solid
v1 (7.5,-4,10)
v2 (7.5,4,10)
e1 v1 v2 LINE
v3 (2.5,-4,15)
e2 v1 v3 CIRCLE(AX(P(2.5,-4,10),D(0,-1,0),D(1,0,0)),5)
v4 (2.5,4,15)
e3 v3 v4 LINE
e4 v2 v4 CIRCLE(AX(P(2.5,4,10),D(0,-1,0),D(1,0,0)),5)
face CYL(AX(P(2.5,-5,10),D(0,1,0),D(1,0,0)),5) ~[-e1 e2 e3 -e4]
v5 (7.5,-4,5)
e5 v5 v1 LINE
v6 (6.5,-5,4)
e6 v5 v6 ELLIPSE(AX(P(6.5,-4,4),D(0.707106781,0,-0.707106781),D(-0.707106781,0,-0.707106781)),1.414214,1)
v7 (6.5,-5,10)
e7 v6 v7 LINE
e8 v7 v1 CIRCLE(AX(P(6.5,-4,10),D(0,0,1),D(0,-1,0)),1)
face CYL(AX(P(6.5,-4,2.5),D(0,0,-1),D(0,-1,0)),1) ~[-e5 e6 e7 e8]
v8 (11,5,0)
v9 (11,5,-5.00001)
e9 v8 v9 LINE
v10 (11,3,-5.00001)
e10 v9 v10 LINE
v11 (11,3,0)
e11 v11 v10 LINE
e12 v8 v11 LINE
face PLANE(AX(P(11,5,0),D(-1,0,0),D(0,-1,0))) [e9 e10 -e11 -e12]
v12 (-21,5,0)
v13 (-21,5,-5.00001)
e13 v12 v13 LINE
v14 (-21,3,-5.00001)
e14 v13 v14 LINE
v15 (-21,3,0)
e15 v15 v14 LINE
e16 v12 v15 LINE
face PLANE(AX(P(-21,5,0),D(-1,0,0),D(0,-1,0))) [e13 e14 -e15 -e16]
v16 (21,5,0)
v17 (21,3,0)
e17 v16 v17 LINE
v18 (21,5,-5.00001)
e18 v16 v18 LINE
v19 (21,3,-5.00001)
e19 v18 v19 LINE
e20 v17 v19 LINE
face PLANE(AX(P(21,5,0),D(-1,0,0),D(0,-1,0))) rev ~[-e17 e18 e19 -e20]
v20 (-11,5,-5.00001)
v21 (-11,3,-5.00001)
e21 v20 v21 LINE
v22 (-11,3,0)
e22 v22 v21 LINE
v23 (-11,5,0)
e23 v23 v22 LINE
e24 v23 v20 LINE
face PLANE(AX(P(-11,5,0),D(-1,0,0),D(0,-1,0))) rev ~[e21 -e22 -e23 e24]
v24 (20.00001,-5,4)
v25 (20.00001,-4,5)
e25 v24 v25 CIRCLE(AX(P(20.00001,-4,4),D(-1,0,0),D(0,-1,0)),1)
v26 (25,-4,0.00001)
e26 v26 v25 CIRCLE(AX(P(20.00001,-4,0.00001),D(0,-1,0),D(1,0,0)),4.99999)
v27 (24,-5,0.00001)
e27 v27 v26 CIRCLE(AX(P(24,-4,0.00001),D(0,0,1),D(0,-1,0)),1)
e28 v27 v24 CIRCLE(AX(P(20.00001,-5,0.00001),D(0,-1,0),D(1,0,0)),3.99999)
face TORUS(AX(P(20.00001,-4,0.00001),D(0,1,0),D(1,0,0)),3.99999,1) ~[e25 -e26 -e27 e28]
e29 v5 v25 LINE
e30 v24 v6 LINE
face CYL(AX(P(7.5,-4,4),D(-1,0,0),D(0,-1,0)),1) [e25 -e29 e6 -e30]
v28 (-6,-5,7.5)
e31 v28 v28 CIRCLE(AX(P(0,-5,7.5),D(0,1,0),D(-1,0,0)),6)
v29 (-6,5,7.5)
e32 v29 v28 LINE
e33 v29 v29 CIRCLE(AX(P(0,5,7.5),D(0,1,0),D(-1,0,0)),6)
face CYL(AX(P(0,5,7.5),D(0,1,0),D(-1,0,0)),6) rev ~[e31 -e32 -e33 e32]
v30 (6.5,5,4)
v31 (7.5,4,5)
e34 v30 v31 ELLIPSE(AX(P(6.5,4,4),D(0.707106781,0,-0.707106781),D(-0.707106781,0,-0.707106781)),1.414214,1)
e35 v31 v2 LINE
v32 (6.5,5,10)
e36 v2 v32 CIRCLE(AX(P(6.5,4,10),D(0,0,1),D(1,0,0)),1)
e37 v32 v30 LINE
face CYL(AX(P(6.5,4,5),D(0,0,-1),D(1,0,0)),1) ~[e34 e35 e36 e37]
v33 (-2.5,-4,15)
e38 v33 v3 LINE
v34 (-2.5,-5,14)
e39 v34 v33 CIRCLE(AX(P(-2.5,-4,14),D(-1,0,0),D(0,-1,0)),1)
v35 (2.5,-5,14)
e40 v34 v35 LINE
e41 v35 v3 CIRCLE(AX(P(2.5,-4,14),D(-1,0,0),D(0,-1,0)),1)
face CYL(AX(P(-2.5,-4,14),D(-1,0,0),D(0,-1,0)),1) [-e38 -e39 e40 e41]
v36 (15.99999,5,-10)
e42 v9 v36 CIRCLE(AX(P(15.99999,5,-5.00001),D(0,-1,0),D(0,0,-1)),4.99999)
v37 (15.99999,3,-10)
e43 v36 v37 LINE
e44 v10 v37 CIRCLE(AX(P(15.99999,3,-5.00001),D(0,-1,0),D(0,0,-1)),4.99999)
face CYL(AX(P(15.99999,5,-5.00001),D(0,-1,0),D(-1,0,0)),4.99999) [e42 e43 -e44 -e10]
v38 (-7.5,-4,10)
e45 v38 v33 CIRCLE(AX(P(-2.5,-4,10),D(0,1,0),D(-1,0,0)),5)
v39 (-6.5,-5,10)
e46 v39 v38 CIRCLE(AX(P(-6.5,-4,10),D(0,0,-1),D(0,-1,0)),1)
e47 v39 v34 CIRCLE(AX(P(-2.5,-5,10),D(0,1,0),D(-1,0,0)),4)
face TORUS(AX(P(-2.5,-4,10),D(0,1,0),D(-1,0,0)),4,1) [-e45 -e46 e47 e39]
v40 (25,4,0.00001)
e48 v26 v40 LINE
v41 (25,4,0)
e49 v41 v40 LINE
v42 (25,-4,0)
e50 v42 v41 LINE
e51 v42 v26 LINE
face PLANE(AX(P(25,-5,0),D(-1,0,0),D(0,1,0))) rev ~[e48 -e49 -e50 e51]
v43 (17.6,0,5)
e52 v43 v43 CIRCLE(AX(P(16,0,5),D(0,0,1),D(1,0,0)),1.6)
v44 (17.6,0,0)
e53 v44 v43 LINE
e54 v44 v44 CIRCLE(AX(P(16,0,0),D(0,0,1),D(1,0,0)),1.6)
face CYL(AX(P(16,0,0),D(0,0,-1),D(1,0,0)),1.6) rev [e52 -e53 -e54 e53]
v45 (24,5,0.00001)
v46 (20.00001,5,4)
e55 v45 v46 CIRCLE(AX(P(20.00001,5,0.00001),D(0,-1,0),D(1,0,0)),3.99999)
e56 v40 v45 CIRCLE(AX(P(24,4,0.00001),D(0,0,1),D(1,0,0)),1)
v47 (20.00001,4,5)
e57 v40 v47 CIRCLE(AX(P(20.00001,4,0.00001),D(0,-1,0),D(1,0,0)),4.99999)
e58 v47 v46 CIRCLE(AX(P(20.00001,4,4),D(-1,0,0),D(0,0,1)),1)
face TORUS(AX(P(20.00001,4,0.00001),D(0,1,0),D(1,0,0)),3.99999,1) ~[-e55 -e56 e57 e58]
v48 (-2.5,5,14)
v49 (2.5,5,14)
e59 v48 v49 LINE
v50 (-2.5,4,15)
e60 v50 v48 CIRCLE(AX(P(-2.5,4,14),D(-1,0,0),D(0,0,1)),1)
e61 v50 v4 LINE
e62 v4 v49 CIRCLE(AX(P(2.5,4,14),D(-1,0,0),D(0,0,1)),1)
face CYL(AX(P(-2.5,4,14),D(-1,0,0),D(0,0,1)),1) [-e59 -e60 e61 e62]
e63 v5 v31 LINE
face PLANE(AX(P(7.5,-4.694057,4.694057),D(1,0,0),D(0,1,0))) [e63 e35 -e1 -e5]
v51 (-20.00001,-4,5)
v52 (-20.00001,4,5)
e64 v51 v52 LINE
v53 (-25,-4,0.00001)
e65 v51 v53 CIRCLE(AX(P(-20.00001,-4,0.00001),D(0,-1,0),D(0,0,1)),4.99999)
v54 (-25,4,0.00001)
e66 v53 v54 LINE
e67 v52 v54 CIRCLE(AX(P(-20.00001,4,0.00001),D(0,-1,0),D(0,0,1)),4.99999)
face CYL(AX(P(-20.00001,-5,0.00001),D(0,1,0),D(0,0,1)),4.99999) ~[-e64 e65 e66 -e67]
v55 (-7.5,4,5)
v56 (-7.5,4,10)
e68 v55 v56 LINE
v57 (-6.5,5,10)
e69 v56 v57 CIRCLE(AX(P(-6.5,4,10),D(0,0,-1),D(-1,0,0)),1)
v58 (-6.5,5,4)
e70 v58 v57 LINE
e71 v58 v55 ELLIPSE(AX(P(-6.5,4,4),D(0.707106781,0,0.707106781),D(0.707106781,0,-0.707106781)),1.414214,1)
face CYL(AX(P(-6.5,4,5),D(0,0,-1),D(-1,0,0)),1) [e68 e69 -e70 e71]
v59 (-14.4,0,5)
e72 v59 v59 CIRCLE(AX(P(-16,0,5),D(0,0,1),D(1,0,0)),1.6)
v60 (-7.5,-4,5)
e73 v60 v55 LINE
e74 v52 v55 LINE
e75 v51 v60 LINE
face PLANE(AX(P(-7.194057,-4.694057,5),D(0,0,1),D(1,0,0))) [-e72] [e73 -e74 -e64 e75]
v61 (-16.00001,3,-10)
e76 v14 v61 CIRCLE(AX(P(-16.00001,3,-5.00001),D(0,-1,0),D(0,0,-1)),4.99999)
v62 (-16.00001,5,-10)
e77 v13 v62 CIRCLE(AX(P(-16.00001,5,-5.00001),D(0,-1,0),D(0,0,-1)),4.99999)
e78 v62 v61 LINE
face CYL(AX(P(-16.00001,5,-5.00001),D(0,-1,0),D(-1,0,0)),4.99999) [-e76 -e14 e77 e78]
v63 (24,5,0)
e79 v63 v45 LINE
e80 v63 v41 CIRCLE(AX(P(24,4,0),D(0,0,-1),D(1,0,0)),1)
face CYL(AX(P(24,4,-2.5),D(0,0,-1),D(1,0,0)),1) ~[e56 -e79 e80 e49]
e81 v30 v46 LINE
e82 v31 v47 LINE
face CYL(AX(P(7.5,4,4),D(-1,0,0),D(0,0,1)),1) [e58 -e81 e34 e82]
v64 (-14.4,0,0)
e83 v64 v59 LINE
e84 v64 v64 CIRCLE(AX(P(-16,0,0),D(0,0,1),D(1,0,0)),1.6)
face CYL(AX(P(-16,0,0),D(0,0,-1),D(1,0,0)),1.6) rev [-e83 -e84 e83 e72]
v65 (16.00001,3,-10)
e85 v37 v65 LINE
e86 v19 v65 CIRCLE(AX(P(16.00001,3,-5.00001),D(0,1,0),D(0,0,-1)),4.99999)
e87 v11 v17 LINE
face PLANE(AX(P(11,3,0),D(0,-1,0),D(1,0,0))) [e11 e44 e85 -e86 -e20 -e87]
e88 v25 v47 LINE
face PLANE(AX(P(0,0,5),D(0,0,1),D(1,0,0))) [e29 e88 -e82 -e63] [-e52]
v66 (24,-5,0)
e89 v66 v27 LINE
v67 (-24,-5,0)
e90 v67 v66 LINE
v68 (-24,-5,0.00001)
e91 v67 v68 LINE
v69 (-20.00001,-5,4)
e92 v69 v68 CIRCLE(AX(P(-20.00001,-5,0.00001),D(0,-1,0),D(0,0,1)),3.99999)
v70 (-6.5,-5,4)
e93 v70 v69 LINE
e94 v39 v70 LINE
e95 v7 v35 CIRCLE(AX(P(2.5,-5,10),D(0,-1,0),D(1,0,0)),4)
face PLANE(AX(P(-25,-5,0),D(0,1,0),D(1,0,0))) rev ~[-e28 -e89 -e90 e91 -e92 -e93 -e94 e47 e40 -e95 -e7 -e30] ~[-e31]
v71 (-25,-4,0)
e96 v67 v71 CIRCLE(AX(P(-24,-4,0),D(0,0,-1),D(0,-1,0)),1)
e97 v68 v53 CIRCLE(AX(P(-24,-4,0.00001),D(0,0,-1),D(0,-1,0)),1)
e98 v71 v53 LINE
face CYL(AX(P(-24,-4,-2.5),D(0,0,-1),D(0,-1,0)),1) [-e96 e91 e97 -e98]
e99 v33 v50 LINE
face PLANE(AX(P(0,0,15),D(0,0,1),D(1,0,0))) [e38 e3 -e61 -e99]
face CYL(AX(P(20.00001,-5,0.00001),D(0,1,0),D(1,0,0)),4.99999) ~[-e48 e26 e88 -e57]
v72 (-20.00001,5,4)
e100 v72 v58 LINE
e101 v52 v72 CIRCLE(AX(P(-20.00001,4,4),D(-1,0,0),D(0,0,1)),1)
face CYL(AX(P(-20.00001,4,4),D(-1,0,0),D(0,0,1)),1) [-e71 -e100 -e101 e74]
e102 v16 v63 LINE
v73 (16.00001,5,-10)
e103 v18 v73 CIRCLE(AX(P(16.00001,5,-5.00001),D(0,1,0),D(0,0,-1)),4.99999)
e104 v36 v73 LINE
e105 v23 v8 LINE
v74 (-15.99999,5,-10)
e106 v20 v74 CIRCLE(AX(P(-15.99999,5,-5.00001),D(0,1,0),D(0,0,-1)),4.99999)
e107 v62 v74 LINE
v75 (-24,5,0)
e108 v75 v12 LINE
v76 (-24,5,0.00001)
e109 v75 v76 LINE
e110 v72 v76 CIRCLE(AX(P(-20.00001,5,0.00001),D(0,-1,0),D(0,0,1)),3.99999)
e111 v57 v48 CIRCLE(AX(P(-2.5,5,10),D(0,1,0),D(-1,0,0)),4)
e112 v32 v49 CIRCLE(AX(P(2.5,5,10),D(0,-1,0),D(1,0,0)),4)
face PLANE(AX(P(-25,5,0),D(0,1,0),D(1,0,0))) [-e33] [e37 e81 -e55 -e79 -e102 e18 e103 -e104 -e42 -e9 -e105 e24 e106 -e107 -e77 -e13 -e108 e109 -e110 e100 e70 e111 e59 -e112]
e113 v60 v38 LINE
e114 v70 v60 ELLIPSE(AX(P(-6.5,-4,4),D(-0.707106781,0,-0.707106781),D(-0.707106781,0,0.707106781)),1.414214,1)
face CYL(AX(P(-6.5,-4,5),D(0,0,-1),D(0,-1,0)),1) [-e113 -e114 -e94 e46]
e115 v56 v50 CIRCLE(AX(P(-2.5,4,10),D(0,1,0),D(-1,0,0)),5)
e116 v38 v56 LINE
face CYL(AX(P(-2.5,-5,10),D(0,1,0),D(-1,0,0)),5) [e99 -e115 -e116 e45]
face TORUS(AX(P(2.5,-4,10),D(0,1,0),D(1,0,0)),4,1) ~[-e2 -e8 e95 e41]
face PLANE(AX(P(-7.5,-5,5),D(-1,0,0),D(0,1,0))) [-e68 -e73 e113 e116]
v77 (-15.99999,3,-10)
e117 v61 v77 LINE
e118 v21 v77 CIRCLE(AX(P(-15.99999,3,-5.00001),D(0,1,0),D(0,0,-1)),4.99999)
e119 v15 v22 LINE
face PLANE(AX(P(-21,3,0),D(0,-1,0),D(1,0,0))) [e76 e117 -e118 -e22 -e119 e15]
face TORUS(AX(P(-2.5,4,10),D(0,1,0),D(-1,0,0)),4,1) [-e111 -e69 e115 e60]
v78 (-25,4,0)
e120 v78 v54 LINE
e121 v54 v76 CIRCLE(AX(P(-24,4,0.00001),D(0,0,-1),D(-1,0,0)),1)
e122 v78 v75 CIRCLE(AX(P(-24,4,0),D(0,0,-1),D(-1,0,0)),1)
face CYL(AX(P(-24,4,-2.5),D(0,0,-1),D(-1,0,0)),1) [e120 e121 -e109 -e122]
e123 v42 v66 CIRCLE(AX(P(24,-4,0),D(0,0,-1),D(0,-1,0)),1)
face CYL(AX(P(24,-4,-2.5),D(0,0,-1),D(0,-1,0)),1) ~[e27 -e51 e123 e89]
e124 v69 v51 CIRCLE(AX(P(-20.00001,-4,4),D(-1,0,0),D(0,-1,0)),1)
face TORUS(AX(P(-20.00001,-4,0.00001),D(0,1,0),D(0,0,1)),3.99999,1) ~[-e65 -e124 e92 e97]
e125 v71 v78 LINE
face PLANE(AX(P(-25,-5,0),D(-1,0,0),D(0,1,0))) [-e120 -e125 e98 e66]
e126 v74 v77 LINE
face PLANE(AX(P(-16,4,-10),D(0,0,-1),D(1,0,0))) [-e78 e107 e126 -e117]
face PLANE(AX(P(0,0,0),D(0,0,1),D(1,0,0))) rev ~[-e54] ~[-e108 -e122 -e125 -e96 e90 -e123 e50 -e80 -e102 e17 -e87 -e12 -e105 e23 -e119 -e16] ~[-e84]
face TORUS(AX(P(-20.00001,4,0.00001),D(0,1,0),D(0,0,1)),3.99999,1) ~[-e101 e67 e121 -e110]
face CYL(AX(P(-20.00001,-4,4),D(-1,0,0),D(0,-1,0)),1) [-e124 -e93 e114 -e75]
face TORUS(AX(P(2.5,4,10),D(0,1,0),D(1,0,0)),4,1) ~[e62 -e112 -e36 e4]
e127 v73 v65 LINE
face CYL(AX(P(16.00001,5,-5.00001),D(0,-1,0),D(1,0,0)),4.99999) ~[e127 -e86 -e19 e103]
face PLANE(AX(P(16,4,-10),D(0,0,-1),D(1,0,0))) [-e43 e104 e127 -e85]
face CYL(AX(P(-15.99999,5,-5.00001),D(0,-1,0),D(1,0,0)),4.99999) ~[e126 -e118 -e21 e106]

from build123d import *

# Parameters (mm, degrees)
F0_W         = 50
F0_H         = 10
F0_R         = 1.6
F1_DEPTH     = 5
F2_W         = 15
F2_H         = 10
F2_R         = 1.6
F3_DEPTH     = 10
F5_R         = 5
F6_R         = 4.99999
F4_R         = 6
F7_DEPTH     = 25
F8_T1_DEPTH  = 12.50001
F8_T3_DEPTH  = 5
F8_T5_DEPTH  = 5
F8_T7_DEPTH  = 12.50001
F8_T9_DEPTH  = 2.50001
F8_T12_ANGLE = 90
F8_T14_ANGLE = 90
F8_T16_ANGLE = 90
F8_T18_ANGLE = 90
F8_T20_ANGLE = 90
F8_T22_ANGLE = 90
F8_T24_ANGLE = 90
F8_T26_ANGLE = 90
F8_T31_DEPTH = 7.5
F8_T35_DEPTH = 15.00001
F8_T42_DEPTH = 15.00001
F8_T46_DEPTH = 7.5
F8_T53_DEPTH = 15.00001
F8_T57_DEPTH = 7.5
F8_T64_DEPTH = 7.5
F8_T68_DEPTH = 15.00001
F9_W         = 10
F9_H         = 2
F10_DEPTH    = 10
F11_R        = 4.99999


# Not quite as in the source:
# - a fillet or chamfer that OpenCascade refuses, or shapes differently, is made with other operations: its cross-section is extruded or revolved along the edge and cut away or added
# - a fillet or chamfer is up to 0.001 mm smaller than in the source, because OpenCascade refuses the exact size


with BuildPart() as f1:
    # F0 (on Top) → F1 (new body)
    with BuildSketch(Plane.XY):
        Rectangle(F0_W, F0_H)
        with Locations((-16, 0)):
            Circle(F0_R, mode=Mode.SUBTRACT)
        with Locations((16, 0)):
            Circle(F0_R, mode=Mode.SUBTRACT)
    extrude(amount=F1_DEPTH)

    # F2 (on face) → F3 (join)
    with BuildSketch(Plane.XY.offset(5)):
        Rectangle(F2_W, F2_H)
        with Locations((-3.9, 0)):
            Circle(F2_R, mode=Mode.SUBTRACT)
        with Locations((3.9, 0)):
            Circle(F2_R, mode=Mode.SUBTRACT)
        with Locations((3.9, 0)):
            Circle(F2_R)
        with Locations((-3.9, 0)):
            Circle(F2_R)
    extrude(amount=F3_DEPTH)

    # F5
    f5_edges = [f1.edges().sort_by_distance(p)[0] for p in [
        (7.5, 0, 15),
        (-7.5, 0, 15),
    ]]
    fillet(f5_edges, radius=F5_R)

    # F6 (radius 5 in the source; OpenCascade refuses exactly that, so slightly less here)
    f6_edges = [f1.edges().sort_by_distance(p)[0] for p in [
        (-25, 0, 5),
        (25, 0, 5),
    ]]
    fillet(f6_edges, radius=F6_R)

    # F4 (on face) → F7 (cut)
    with BuildSketch(Plane(origin=(0, 5, 0), x_dir=(-1, 0, 0), z_dir=(0, 1, 0))):
        with Locations((0, 7.5)):
            Circle(F4_R)
    extrude(amount=-F7_DEPTH, mode=Mode.SUBTRACT)

    # F8: fillet of radius 1 on 18 edges, made by hand

    # F8_s2 → F8_t1 (cut)
    with BuildSketch(Plane.YZ.offset(7.5)):
        with BuildLine():
            ThreePointArc((-5, 4), (-4.7071067812, 4.7071067812), (-4, 5))
            Line((-4, 5), (-5, 5))
            Line((-5, 5), (-5, 4))
        make_face()
        with BuildLine():
            ThreePointArc((4, 5), (4.7071067812, 4.7071067812), (5, 4))
            Line((5, 4), (5, 5))
            Line((5, 5), (4, 5))
        make_face()
    extrude(amount=F8_T1_DEPTH, mode=Mode.SUBTRACT)

    # F8_s4 → F8_t3 (cut)
    with BuildSketch(Plane.XY.offset(5)):
        with BuildLine():
            ThreePointArc((6.5, -5), (7.2071067812, -4.7071067812), (7.5, -4))
            Line((7.5, -4), (7.5, -5))
            Line((7.5, -5), (6.5, -5))
        make_face()
        with BuildLine():
            ThreePointArc((-6.5, -5), (-7.2071067812, -4.7071067812), (-7.5, -4))
            Line((-7.5, -4), (-7.5, -5))
            Line((-7.5, -5), (-6.5, -5))
        make_face()
        with BuildLine():
            ThreePointArc((7.5, 4), (7.2071067812, 4.7071067812), (6.5, 5))
            Line((6.5, 5), (7.5, 5))
            Line((7.5, 5), (7.5, 4))
        make_face()
        with BuildLine():
            ThreePointArc((-7.5, 4), (-7.2071067812, 4.7071067812), (-6.5, 5))
            Line((-6.5, 5), (-7.5, 5))
            Line((-7.5, 5), (-7.5, 4))
        make_face()
    extrude(amount=F8_T3_DEPTH, mode=Mode.SUBTRACT)

    # F8_s6 → F8_t5 (cut)
    with BuildSketch(Plane.YZ.offset(-2.5)):
        with BuildLine():
            ThreePointArc((-5, 14), (-4.7071067812, 14.7071067812), (-4, 15))
            Line((-4, 15), (-5, 15))
            Line((-5, 15), (-5, 14))
        make_face()
        with BuildLine():
            ThreePointArc((4, 15), (4.7071067812, 14.7071067812), (5, 14))
            Line((5, 14), (5, 15))
            Line((5, 15), (4, 15))
        make_face()
    extrude(amount=F8_T5_DEPTH, mode=Mode.SUBTRACT)

    # F8_s8 → F8_t7 (cut)
    with BuildSketch(Plane.YZ.offset(-20.00001)):
        with BuildLine():
            ThreePointArc((-5, 4), (-4.7071067812, 4.7071067812), (-4, 5))
            Line((-4, 5), (-5, 5))
            Line((-5, 5), (-5, 4))
        make_face()
        with BuildLine():
            ThreePointArc((4, 5), (4.7071067812, 4.7071067812), (5, 4))
            Line((5, 4), (5, 5))
            Line((5, 5), (4, 5))
        make_face()
    extrude(amount=F8_T7_DEPTH, mode=Mode.SUBTRACT)

    # F8_s10 → F8_t9 (cut)
    with BuildSketch(Plane.XY.offset(-2.5)):
        with BuildLine():
            ThreePointArc((-25, 4), (-24.7071067812, 4.7071067812), (-24, 5))
            Line((-24, 5), (-25, 5))
            Line((-25, 5), (-25, 4))
        make_face()
        with BuildLine():
            ThreePointArc((25, 4), (24.7071067812, 4.7071067812), (24, 5))
            Line((24, 5), (25, 5))
            Line((25, 5), (25, 4))
        make_face()
        with BuildLine():
            ThreePointArc((-24, -5), (-24.7071067812, -4.7071067812), (-25, -4))
            Line((-25, -4), (-25, -5))
            Line((-25, -5), (-24, -5))
        make_face()
        with BuildLine():
            ThreePointArc((24, -5), (24.7071067812, -4.7071067812), (25, -4))
            Line((25, -4), (25, -5))
            Line((25, -5), (24, -5))
        make_face()
    extrude(amount=F8_T9_DEPTH, mode=Mode.SUBTRACT)

    # F8_s11 → F8_t12 (revolve, cut)
    with BuildSketch(Plane.XY.offset(1e-05)):
        with BuildLine():
            ThreePointArc((24, -5), (24.7071067812, -4.7071067812), (25, -4))
            Line((25, -4), (25, -5))
            Line((25, -5), (24, -5))
        make_face()
    revolve(axis=Axis((20.00001, -5, 1e-05), (0, -1, 0)), revolution_arc=F8_T12_ANGLE, mode=Mode.SUBTRACT)

    # F8_s13 → F8_t14 (revolve, cut)
    with BuildSketch(Plane.XY.offset(10)):
        with BuildLine():
            ThreePointArc((6.5, -5), (7.2071067812, -4.7071067812), (7.5, -4))
            Line((7.5, -4), (7.5, -5))
            Line((7.5, -5), (6.5, -5))
        make_face()
    revolve(axis=Axis((2.5, -5, 10), (0, -1, 0)), revolution_arc=F8_T14_ANGLE, mode=Mode.SUBTRACT)

    # F8_s15 → F8_t16 (revolve, cut)
    with BuildSketch(Plane.XY.offset(10)):
        with BuildLine():
            ThreePointArc((-6.5, -5), (-7.2071067812, -4.7071067812), (-7.5, -4))
            Line((-7.5, -4), (-7.5, -5))
            Line((-7.5, -5), (-6.5, -5))
        make_face()
    revolve(axis=Axis((-2.5, -5, 10), (0, 1, 0)), revolution_arc=F8_T16_ANGLE, mode=Mode.SUBTRACT)

    # F8_s17 → F8_t18 (revolve, cut)
    with BuildSketch(Plane.YZ.offset(-20.00001)):
        with BuildLine():
            ThreePointArc((-5, 4), (-4.7071067812, 4.7071067812), (-4, 5))
            Line((-4, 5), (-5, 5))
            Line((-5, 5), (-5, 4))
        make_face()
    revolve(axis=Axis((-20.00001, -5, 1e-05), (0, -1, 0)), revolution_arc=F8_T18_ANGLE, mode=Mode.SUBTRACT)

    # F8_s19 → F8_t20 (revolve, cut)
    with BuildSketch(Plane.XY.offset(10)):
        with BuildLine():
            ThreePointArc((7.5, 4), (7.2071067812, 4.7071067812), (6.5, 5))
            Line((6.5, 5), (7.5, 5))
            Line((7.5, 5), (7.5, 4))
        make_face()
    revolve(axis=Axis((2.5, 5, 10), (0, -1, 0)), revolution_arc=F8_T20_ANGLE, mode=Mode.SUBTRACT)

    # F8_s21 → F8_t22 (revolve, cut)
    with BuildSketch(Plane.XY.offset(1e-05)):
        with BuildLine():
            ThreePointArc((25, 4), (24.7071067812, 4.7071067812), (24, 5))
            Line((24, 5), (25, 5))
            Line((25, 5), (25, 4))
        make_face()
    revolve(axis=Axis((20.00001, 5, 1e-05), (0, -1, 0)), revolution_arc=F8_T22_ANGLE, mode=Mode.SUBTRACT)

    # F8_s23 → F8_t24 (revolve, cut)
    with BuildSketch(Plane.XY.offset(10)):
        with BuildLine():
            ThreePointArc((-7.5, 4), (-7.2071067812, 4.7071067812), (-6.5, 5))
            Line((-6.5, 5), (-7.5, 5))
            Line((-7.5, 5), (-7.5, 4))
        make_face()
    revolve(axis=Axis((-2.5, 5, 10), (0, 1, 0)), revolution_arc=F8_T24_ANGLE, mode=Mode.SUBTRACT)

    # F8_s25 → F8_t26 (revolve, cut)
    with BuildSketch(Plane.YZ.offset(-20.00001)):
        with BuildLine():
            ThreePointArc((4, 5), (4.7071067812, 4.7071067812), (5, 4))
            Line((5, 4), (5, 5))
            Line((5, 5), (4, 5))
        make_face()
    revolve(axis=Axis((-20.00001, 5, 1e-05), (0, -1, 0)), revolution_arc=F8_T26_ANGLE, mode=Mode.SUBTRACT)


with BuildPart() as f8_tool29:
    # F8_s30 → F8_t31 (new body)
    with BuildSketch(Plane.XY.offset(2.5)):
        with BuildLine():
            ThreePointArc((6.5, -5), (7.2071067812, -4.7071067812), (7.5, -4))
            Line((7.5, -4), (7.5, -5))
            Line((7.5, -5), (6.5, -5))
        make_face()
    extrude(amount=F8_T31_DEPTH)

    split(bisect_by=Plane.XY.offset(5), keep=Keep.BOTTOM)


with BuildPart() as f8_tool33:
    # F8_s34 → F8_t35 (new body)
    with BuildSketch(Plane.YZ.offset(5)):
        with BuildLine():
            ThreePointArc((-5, 4), (-4.7071067812, 4.7071067812), (-4, 5))
            Line((-4, 5), (-5, 5))
            Line((-5, 5), (-5, 4))
        make_face()
    extrude(amount=F8_T35_DEPTH)

    split(bisect_by=Plane.YZ.offset(7.5), keep=Keep.BOTTOM)


with BuildPart() as f8_tool29_1:
    add(f8_tool29.part)

    # F8_t37: intersect F8_tool33
    add(f8_tool33.part, mode=Mode.INTERSECT)


with BuildPart() as f1_1:
    add(f1.part)

    # F8_t27: cut F8_tool29
    add(f8_tool29_1.part, mode=Mode.SUBTRACT)


with BuildPart() as f8_tool40:
    # F8_s41 → F8_t42 (new body)
    with BuildSketch(Plane.YZ.offset(-20.00001)):
        with BuildLine():
            ThreePointArc((-5, 4), (-4.7071067812, 4.7071067812), (-4, 5))
            Line((-4, 5), (-5, 5))
            Line((-5, 5), (-5, 4))
        make_face()
    extrude(amount=F8_T42_DEPTH)

    split(bisect_by=Plane.YZ.offset(-7.5), keep=Keep.TOP)


with BuildPart() as f8_tool44:
    # F8_s45 → F8_t46 (new body)
    with BuildSketch(Plane.XY.offset(2.5)):
        with BuildLine():
            ThreePointArc((-6.5, -5), (-7.2071067812, -4.7071067812), (-7.5, -4))
            Line((-7.5, -4), (-7.5, -5))
            Line((-7.5, -5), (-6.5, -5))
        make_face()
    extrude(amount=F8_T46_DEPTH)

    split(bisect_by=Plane.XY.offset(5), keep=Keep.BOTTOM)


with BuildPart() as f8_tool40_1:
    add(f8_tool40.part)

    # F8_t48: intersect F8_tool44
    add(f8_tool44.part, mode=Mode.INTERSECT)


with BuildPart() as f1_2:
    add(f1_1.part)

    # F8_t38: cut F8_tool40
    add(f8_tool40_1.part, mode=Mode.SUBTRACT)


with BuildPart() as f8_tool51:
    # F8_s52 → F8_t53 (new body)
    with BuildSketch(Plane.YZ.offset(-5)):
        with BuildLine():
            ThreePointArc((4, 5), (4.7071067812, 4.7071067812), (5, 4))
            Line((5, 4), (5, 5))
            Line((5, 5), (4, 5))
        make_face()
    extrude(amount=-F8_T53_DEPTH)

    split(bisect_by=Plane.YZ.offset(-7.5), keep=Keep.TOP)


with BuildPart() as f8_tool55:
    # F8_s56 → F8_t57 (new body)
    with BuildSketch(Plane.XY.offset(2.5)):
        with BuildLine():
            ThreePointArc((-7.5, 4), (-7.2071067812, 4.7071067812), (-6.5, 5))
            Line((-6.5, 5), (-7.5, 5))
            Line((-7.5, 5), (-7.5, 4))
        make_face()
    extrude(amount=F8_T57_DEPTH)

    split(bisect_by=Plane.XY.offset(5), keep=Keep.BOTTOM)


with BuildPart() as f8_tool51_1:
    add(f8_tool51.part)

    # F8_t59: intersect F8_tool55
    add(f8_tool55.part, mode=Mode.INTERSECT)


with BuildPart() as f1_3:
    add(f1_2.part)

    # F8_t49: cut F8_tool51
    add(f8_tool51_1.part, mode=Mode.SUBTRACT)


with BuildPart() as f8_tool62:
    # F8_s63 → F8_t64 (new body)
    with BuildSketch(Plane.XY.offset(2.5)):
        with BuildLine():
            ThreePointArc((7.5, 4), (7.2071067812, 4.7071067812), (6.5, 5))
            Line((6.5, 5), (7.5, 5))
            Line((7.5, 5), (7.5, 4))
        make_face()
    extrude(amount=F8_T64_DEPTH)

    split(bisect_by=Plane.XY.offset(5), keep=Keep.BOTTOM)


with BuildPart() as f8_tool66:
    # F8_s67 → F8_t68 (new body)
    with BuildSketch(Plane.YZ.offset(20.00001)):
        with BuildLine():
            ThreePointArc((4, 5), (4.7071067812, 4.7071067812), (5, 4))
            Line((5, 4), (5, 5))
            Line((5, 5), (4, 5))
        make_face()
    extrude(amount=-F8_T68_DEPTH)

    split(bisect_by=Plane.YZ.offset(7.5), keep=Keep.BOTTOM)


with BuildPart() as f8_tool62_1:
    add(f8_tool62.part)

    # F8_t70: intersect F8_tool66
    add(f8_tool66.part, mode=Mode.INTERSECT)


with BuildPart() as f1_4:
    add(f1_3.part)

    # F8_t60: cut F8_tool62
    add(f8_tool62_1.part, mode=Mode.SUBTRACT)

    # F9 (on face) → F10 (join)
    with BuildSketch(Plane(origin=(0, 0, 0), x_dir=(1, 0, 0), z_dir=(0, 0, -1))):
        with Locations((-16, -4)):
            Rectangle(F9_W, F9_H)
        with Locations((16, -4)):
            Rectangle(F9_W, F9_H)
    extrude(amount=F10_DEPTH)

    # F11 (radius 5 in the source; OpenCascade refuses exactly that, so slightly less here)
    f11_edges = [f1_4.edges().sort_by_distance(p)[0] for p in [
        (11, 4, -10),
        (21, 4, -10),
        (-21, 4, -10),
        (-11, 4, -10),
    ]]
    fillet(f11_edges, radius=F11_R)


solid = f1_4.part
